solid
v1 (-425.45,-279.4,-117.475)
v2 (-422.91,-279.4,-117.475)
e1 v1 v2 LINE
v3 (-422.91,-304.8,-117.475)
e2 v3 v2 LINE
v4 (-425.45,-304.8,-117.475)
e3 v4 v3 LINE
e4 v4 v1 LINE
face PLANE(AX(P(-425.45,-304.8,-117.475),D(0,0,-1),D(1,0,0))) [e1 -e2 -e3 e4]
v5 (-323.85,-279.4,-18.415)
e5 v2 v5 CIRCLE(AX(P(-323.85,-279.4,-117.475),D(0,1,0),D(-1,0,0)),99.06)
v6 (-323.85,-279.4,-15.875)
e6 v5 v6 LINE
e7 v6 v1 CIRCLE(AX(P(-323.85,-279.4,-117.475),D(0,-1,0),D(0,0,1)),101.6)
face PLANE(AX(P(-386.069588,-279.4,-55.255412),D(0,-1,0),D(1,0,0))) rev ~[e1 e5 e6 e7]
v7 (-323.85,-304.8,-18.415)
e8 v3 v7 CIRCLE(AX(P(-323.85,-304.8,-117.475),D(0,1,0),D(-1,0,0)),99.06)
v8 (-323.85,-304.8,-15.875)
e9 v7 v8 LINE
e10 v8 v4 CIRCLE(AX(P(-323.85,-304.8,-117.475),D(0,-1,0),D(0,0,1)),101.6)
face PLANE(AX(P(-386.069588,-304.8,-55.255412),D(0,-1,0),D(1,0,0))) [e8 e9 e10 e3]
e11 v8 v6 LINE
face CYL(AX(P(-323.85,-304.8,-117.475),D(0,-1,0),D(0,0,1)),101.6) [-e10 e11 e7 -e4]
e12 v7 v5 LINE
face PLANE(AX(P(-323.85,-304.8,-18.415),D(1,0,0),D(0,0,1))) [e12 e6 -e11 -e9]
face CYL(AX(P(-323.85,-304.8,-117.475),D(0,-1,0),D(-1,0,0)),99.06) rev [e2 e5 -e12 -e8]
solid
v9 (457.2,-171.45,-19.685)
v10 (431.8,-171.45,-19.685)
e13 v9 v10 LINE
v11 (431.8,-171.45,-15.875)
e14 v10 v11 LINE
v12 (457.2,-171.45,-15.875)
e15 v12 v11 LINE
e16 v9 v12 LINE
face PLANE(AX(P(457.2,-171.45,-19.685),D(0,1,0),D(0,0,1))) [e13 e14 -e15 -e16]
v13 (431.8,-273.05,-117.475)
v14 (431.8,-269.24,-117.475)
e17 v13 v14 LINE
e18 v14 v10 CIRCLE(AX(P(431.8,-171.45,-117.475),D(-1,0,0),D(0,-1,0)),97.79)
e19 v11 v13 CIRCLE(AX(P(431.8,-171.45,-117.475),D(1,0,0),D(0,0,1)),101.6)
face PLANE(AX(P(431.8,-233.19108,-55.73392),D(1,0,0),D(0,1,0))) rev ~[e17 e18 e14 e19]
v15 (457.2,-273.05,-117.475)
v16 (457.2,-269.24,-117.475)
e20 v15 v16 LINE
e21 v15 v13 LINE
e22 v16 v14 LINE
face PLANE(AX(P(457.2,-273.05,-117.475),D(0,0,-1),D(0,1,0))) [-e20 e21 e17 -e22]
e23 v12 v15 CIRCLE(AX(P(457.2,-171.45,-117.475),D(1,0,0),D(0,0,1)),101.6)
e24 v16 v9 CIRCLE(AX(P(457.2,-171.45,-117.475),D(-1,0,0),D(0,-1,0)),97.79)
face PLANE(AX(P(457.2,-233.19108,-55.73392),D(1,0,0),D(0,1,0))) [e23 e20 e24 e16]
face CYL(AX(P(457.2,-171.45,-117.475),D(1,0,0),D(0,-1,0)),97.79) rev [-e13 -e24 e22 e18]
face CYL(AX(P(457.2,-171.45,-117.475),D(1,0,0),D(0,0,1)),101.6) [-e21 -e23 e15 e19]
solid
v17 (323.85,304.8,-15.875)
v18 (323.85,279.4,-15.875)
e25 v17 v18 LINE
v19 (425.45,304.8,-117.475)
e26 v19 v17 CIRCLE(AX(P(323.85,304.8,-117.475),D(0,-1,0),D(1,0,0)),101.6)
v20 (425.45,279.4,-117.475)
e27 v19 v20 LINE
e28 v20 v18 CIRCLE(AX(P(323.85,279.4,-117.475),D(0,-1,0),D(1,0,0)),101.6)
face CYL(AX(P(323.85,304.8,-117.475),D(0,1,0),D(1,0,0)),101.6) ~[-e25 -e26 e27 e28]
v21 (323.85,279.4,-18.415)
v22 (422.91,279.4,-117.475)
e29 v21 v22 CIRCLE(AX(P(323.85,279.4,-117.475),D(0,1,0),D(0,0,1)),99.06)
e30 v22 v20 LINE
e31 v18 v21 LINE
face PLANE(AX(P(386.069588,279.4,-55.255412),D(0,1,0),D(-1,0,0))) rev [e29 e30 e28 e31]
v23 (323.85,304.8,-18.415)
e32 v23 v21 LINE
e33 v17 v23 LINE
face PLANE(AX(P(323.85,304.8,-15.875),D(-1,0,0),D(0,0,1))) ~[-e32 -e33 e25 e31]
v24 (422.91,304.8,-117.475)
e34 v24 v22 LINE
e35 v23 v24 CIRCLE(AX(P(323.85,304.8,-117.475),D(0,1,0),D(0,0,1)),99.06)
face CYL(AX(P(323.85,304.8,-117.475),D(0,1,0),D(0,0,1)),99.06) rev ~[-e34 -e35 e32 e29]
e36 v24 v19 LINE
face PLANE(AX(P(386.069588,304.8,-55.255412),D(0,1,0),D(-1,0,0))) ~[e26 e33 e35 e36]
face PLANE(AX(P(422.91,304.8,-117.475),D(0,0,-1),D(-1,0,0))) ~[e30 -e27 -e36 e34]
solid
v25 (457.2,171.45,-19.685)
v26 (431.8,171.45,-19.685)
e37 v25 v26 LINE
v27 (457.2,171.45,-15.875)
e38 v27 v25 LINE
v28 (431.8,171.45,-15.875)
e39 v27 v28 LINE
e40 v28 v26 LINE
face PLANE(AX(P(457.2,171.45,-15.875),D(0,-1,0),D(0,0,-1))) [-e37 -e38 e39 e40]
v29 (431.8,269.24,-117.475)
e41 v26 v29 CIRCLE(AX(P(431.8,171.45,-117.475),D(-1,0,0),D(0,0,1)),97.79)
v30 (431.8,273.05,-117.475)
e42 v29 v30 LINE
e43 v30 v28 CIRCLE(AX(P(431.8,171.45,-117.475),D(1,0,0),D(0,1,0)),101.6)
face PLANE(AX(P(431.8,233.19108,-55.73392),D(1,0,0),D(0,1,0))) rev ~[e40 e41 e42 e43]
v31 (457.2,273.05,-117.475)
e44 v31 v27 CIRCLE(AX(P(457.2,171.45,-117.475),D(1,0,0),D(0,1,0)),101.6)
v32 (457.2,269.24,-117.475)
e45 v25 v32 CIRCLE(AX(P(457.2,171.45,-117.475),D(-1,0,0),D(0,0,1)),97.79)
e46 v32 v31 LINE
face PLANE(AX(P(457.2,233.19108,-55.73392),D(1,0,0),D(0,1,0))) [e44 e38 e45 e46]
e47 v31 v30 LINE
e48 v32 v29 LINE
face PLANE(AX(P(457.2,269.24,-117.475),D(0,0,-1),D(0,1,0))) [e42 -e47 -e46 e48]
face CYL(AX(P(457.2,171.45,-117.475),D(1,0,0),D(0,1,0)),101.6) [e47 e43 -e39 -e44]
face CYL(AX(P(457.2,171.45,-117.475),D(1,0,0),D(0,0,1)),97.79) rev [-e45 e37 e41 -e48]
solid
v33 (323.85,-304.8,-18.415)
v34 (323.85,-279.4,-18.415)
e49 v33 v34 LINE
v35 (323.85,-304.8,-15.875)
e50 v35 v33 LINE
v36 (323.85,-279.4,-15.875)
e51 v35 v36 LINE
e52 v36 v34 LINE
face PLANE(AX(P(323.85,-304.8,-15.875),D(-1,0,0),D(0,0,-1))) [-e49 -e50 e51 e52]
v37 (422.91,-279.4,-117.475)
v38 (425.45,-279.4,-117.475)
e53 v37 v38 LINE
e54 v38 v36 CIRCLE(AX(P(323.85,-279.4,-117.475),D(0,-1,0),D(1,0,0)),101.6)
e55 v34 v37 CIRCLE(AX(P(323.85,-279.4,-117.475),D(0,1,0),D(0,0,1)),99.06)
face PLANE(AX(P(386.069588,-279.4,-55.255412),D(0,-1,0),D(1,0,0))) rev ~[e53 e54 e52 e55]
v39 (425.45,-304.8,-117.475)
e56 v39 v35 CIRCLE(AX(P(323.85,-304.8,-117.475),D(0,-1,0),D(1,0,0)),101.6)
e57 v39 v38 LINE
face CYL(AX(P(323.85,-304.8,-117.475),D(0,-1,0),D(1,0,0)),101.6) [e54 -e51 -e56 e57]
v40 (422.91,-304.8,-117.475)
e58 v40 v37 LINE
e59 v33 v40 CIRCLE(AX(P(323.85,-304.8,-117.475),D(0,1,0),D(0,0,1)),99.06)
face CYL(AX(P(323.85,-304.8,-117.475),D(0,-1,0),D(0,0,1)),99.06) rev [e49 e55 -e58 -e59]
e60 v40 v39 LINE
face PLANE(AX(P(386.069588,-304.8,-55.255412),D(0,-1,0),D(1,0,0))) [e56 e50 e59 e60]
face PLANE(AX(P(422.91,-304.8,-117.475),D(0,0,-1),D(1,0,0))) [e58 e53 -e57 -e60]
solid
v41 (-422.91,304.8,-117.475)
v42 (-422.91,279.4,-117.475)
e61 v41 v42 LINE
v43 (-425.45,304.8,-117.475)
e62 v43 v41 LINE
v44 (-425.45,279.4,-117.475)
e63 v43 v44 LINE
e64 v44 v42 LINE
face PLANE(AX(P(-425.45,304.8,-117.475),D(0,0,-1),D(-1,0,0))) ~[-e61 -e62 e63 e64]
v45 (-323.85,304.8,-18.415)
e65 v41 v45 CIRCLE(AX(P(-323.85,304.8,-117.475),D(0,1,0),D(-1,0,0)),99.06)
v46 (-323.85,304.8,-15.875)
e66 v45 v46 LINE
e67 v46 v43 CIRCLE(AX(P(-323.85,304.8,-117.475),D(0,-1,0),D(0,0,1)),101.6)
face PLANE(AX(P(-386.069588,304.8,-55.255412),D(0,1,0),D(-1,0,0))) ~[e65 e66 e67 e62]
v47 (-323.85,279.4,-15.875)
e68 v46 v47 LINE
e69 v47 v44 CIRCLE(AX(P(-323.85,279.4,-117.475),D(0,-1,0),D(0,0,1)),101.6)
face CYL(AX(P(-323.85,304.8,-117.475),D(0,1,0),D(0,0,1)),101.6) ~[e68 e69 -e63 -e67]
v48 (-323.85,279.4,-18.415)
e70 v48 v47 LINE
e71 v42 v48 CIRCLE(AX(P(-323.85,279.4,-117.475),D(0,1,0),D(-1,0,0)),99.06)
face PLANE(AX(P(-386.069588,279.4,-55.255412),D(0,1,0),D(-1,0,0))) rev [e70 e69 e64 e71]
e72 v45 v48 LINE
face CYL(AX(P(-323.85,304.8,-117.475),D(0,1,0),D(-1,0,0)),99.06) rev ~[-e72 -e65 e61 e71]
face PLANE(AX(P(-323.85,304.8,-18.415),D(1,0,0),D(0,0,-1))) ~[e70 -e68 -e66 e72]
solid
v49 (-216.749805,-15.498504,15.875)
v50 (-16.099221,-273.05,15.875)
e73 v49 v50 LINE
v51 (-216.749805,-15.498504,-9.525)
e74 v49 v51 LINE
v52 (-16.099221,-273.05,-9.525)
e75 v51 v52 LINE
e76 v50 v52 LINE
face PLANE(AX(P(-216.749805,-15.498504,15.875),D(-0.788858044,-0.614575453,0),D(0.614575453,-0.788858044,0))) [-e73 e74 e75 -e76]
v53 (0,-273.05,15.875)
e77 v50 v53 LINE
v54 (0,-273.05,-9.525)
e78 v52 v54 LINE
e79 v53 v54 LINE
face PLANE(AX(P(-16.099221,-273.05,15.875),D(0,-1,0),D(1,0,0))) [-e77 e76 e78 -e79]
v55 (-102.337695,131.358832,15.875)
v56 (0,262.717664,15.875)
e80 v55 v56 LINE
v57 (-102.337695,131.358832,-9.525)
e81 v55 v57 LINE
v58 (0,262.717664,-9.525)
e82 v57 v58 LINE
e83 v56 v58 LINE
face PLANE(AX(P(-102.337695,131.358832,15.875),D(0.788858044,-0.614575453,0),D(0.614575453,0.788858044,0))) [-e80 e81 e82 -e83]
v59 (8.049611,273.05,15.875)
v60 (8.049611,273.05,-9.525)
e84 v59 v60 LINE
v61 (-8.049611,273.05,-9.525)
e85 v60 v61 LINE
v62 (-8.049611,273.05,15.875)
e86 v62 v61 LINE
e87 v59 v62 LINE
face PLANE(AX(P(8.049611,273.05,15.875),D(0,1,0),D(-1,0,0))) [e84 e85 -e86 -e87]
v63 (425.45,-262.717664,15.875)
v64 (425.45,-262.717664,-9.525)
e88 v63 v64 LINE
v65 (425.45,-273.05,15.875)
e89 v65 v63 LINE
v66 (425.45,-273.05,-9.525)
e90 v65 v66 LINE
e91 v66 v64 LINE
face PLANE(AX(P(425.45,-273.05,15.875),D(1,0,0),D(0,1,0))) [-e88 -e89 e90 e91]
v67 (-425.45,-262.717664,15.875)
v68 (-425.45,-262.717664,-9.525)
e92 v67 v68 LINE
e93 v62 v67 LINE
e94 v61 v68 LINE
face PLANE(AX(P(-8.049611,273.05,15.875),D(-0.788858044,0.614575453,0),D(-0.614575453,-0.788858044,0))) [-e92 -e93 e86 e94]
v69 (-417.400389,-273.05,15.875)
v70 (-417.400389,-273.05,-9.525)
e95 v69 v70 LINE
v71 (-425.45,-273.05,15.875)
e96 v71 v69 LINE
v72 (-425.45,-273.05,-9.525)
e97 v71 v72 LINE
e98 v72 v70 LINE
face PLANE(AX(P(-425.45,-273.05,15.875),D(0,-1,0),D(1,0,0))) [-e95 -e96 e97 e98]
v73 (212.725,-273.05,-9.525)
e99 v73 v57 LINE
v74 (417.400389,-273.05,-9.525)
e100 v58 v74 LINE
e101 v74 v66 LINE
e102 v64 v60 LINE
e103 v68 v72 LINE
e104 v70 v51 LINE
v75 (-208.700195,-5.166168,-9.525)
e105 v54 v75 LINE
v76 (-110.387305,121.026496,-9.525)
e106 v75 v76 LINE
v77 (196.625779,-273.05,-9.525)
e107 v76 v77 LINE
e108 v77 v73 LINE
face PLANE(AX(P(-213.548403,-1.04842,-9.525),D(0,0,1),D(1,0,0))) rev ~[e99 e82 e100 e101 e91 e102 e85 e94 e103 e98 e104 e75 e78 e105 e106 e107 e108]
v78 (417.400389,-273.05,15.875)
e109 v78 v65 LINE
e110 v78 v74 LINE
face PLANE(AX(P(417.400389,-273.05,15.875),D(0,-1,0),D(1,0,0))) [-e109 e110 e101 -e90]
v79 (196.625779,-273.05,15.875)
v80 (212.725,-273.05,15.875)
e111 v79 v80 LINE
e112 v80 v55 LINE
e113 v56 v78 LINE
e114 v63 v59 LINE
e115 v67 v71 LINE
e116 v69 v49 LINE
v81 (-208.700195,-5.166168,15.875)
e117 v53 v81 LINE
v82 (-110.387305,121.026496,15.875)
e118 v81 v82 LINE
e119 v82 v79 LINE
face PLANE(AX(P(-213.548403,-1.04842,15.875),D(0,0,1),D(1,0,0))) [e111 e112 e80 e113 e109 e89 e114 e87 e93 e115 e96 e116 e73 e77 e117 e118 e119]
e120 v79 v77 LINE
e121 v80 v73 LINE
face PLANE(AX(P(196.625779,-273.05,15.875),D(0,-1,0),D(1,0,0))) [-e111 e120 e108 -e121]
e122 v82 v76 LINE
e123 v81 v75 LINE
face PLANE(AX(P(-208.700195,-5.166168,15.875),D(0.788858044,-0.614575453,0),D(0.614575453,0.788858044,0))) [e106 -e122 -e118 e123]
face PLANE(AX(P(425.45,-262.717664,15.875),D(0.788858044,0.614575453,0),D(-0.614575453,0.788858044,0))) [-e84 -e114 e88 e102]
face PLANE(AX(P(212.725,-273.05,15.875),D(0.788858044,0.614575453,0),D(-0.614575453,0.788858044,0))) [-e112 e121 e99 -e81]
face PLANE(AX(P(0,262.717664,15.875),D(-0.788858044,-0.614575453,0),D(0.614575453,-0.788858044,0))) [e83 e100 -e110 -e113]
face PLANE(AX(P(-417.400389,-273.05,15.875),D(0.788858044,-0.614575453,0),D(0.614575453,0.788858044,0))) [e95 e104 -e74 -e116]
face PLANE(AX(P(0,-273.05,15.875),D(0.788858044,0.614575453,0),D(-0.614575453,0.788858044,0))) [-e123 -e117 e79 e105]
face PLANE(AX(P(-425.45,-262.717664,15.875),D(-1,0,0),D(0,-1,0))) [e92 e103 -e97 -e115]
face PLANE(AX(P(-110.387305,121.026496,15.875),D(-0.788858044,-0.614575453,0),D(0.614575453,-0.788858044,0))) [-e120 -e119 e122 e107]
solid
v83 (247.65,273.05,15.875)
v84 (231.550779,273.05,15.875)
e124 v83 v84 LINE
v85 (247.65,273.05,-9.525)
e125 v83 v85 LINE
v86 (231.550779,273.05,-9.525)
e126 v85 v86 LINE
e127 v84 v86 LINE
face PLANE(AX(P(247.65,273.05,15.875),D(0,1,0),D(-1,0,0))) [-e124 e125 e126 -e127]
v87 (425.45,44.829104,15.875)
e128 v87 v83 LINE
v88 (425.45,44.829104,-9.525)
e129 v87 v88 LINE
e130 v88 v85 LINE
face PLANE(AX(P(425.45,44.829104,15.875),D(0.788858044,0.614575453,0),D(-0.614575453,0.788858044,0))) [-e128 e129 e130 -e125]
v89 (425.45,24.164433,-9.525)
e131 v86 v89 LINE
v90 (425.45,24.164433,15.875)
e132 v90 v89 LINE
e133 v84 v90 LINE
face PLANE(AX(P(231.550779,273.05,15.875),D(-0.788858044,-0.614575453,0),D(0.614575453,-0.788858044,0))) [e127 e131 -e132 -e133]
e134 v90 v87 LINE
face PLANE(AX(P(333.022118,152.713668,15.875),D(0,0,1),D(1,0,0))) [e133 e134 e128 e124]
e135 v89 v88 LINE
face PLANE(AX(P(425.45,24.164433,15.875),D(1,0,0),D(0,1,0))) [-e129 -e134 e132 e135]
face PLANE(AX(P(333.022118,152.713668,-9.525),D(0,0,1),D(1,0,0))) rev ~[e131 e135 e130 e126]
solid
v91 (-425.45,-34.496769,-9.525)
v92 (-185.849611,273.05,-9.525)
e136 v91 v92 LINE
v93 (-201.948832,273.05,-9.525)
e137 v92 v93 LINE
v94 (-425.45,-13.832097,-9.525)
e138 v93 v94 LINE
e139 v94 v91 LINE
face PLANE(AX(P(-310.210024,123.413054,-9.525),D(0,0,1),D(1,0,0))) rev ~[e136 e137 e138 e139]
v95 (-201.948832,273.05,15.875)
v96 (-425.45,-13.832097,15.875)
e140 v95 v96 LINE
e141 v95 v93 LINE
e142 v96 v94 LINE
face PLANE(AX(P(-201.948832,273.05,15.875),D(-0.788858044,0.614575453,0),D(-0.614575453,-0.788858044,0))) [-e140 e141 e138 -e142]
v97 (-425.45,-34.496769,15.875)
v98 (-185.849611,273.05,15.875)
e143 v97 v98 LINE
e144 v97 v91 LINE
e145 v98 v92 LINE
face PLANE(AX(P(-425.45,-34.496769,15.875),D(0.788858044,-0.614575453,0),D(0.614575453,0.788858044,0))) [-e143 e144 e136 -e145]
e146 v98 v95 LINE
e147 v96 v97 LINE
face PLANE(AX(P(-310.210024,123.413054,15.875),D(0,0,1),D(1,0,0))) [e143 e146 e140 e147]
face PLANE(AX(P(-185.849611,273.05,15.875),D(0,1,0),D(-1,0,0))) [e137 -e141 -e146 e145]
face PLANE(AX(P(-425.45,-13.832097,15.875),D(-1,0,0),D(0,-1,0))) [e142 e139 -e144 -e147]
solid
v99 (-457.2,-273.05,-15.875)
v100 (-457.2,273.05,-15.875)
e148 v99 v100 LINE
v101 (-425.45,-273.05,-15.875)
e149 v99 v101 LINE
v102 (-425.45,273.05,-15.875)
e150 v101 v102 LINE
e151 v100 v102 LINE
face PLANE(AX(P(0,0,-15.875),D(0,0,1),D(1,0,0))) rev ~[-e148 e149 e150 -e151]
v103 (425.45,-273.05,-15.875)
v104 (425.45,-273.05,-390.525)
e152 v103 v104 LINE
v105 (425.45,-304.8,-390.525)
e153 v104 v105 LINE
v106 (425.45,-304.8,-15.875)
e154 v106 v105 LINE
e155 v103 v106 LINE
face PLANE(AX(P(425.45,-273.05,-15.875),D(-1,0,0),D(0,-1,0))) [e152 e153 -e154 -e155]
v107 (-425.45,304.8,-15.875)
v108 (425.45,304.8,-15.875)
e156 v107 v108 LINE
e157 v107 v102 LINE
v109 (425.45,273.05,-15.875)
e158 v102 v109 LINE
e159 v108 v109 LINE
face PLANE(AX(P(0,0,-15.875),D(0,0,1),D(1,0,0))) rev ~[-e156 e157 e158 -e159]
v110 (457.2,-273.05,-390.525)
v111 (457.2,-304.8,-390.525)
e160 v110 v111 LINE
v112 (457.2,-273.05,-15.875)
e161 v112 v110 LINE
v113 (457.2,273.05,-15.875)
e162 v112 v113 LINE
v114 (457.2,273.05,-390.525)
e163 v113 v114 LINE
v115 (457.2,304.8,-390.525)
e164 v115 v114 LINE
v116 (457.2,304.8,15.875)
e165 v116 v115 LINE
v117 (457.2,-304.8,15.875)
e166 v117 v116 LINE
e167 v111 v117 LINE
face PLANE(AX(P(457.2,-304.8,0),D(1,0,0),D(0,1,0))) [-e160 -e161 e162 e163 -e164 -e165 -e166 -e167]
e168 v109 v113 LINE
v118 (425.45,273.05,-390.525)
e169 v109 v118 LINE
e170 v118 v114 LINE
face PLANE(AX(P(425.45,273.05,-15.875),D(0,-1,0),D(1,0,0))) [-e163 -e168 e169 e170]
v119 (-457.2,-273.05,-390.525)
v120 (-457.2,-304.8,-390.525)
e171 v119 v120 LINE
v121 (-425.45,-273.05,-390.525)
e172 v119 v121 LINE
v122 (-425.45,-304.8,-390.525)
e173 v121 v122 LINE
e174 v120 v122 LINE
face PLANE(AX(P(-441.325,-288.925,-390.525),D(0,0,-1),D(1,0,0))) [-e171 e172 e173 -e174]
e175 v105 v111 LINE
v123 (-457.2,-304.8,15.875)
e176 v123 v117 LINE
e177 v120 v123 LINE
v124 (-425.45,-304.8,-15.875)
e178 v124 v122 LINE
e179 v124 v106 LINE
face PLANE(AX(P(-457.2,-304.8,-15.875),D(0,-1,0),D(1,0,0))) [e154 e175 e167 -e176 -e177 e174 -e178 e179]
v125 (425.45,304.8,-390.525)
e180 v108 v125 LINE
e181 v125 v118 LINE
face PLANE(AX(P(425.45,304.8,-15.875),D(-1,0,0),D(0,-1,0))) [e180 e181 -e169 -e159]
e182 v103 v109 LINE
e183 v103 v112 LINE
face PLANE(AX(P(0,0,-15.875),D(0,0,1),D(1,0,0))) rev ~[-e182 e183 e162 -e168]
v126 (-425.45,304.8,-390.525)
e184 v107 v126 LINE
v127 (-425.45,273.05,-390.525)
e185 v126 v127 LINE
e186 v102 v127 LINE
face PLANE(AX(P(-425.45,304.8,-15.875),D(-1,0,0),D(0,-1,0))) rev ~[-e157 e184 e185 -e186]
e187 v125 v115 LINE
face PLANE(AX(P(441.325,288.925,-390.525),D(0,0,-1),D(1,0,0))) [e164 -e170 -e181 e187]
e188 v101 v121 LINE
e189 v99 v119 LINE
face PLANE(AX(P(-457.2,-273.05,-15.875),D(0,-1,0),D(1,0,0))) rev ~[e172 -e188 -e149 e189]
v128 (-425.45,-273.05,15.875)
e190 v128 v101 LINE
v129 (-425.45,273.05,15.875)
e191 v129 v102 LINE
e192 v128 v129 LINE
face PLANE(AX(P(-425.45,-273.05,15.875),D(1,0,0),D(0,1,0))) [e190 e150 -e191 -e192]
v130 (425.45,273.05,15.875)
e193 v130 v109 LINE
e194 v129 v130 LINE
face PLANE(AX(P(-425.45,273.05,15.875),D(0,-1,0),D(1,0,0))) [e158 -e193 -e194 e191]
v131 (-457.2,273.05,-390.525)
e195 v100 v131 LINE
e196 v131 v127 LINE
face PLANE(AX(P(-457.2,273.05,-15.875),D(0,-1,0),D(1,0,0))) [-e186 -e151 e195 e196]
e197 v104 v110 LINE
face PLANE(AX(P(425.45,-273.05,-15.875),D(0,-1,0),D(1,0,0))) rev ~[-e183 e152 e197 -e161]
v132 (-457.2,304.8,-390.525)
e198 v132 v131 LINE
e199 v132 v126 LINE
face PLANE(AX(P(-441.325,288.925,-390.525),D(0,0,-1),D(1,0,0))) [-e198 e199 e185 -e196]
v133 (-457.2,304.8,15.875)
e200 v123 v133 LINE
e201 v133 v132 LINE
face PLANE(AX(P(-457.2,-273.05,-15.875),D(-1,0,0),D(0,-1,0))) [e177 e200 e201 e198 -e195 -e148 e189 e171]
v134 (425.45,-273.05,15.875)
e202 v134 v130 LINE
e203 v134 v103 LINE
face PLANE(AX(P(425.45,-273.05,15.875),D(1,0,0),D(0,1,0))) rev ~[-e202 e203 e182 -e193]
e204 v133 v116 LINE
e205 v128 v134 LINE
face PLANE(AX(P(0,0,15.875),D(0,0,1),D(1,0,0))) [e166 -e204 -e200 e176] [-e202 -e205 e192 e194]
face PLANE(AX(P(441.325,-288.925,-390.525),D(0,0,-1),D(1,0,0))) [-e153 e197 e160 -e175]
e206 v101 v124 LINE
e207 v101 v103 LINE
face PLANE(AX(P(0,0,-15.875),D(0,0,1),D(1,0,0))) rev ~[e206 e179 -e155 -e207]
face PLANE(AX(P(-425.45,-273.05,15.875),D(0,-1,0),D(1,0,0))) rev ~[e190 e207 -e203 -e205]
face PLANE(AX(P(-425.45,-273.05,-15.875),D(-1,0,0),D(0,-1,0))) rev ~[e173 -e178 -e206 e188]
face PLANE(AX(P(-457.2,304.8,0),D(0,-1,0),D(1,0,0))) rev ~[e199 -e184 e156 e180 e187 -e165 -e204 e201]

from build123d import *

# Parameters (mm, degrees)
F0_W      = 914.4
F0_H      = 609.6
F1_DEPTH  = 15.875
F2_W      = 850.9
F2_H      = 546.1
F3_DEPTH  = 31.751
F5_DEPTH  = 25.4
F6_W      = 31.75
F6_H      = 31.75
F7_DEPTH  = 374.65
F9_DEPTH  = 25.4
F12_DEPTH = 25.4


# Not quite as in the source:
# - a feature of the source that left no trace in its solid (it failed there, or was rolled back) is left out
# - a feature names something its author has since deleted; it is built from what else it names


with BuildPart() as f1:
    # F0 (on Top) → F1 (new body, symmetric)
    with BuildSketch(Plane.XY):
        Rectangle(F0_W, F0_H)
    extrude(amount=F1_DEPTH, both=True)

    # F2 (on face) → F3 (cut, through all)
    with BuildSketch(Plane.XY.offset(15.875)):
        Rectangle(F2_W, F2_H)
    extrude(amount=-F3_DEPTH, mode=Mode.SUBTRACT)

    # F6 (on face) → F7 (join)
    with BuildSketch(Plane(origin=(0, 0, -15.875), x_dir=(1, 0, 0), z_dir=(0, 0, -1))):
        with Locations((-441.325, 288.925)):
            Rectangle(F6_W, F6_H)
        with Locations((-441.325, -288.925)):
            Rectangle(F6_W, F6_H)
        with Locations((441.325, 288.925)):
            Rectangle(F6_W, F6_H)
        with Locations((441.325, -288.925)):
            Rectangle(F6_W, F6_H)
    extrude(amount=F7_DEPTH)


with BuildPart() as f5:
    # F4 (on face) → F5 (new body)
    with BuildSketch(Plane.XY.offset(15.875)):
        Polygon((-8.0496105111, 273.05), (-425.45, -262.7176641201), (-425.45, -273.05), (-417.4003894889, -273.05), (-216.7498052556, -15.4985038199), (-208.7001947444, -5.16616794), (-110.3873052556, 121.0264961801), (-102.3376947444, 131.35883206), (0, 262.7176641201), align=None)
        Polygon((8.0496105111, 273.05), (-8.0496105111, 273.05), (0, 262.7176641201), (417.4003894889, -273.05), (425.45, -273.05), (425.45, -262.7176641201), align=None)
        Polygon((212.725, -273.05), (-102.3376947444, 131.35883206), (-110.3873052556, 121.0264961801), (196.6257789778, -273.05), align=None)
        Polygon((-208.7001947444, -5.16616794), (-216.7498052556, -15.4985038199), (-16.0992210222, -273.05), (0, -273.05), align=None)
    extrude(amount=-F5_DEPTH)


with BuildPart() as f5b:
    # F4 (on face) → F5, piece 2 (new body)
    with BuildSketch(Plane.XY.offset(15.875)):
        Polygon((231.5507789778, 273.05), (425.45, 24.1644327177), (425.45, 44.8291044776), (247.65, 273.05), align=None)
    extrude(amount=-F5_DEPTH)


with BuildPart() as f5c:
    # F4 (on face) → F5, piece 3 (new body)
    with BuildSketch(Plane.XY.offset(15.875)):
        Polygon((-425.45, -13.8320968378), (-425.45, -34.4967685977), (-185.8496105111, 273.05), (-201.9488315334, 273.05), align=None)
    extrude(amount=-F5_DEPTH)


with BuildPart() as f9:
    # F8 (on face) → F9 (new body)
    with BuildSketch(Plane.XZ.offset(304.8)):
        with BuildLine():
            Line((-323.85, -18.415), (-323.85, -15.875))
            ThreePointArc((-323.85, -15.875), (-395.6920489686, -45.6329510314), (-425.45, -117.475))
            Line((-425.45, -117.475), (-422.91, -117.475))
            ThreePointArc((-422.91, -117.475), (-393.8959977443, -47.4290022557), (-323.85, -18.415))
        make_face()
    extrude(amount=-F9_DEPTH)


with BuildPart() as f9b:
    # F8 (on face) → F9, piece 2 (new body)
    with BuildSketch(Plane.XZ.offset(304.8)):
        with BuildLine():
            Line((323.85, -15.875), (323.85, -18.415))
            ThreePointArc((323.85, -18.415), (393.8959977443, -47.4290022557), (422.91, -117.475))
            Line((422.91, -117.475), (425.45, -117.475))
            ThreePointArc((425.45, -117.475), (395.6920489686, -45.6329510314), (323.85, -15.875))
        make_face()
    extrude(amount=-F9_DEPTH)


with BuildPart() as f10_1:
    # F10: instance of F9
    add(f9.part.mirror(Plane.XZ))


with BuildPart() as f10_2:
    # F10: instance of F9b
    add(f9b.part.mirror(Plane.XZ))


with BuildPart() as f12:
    # F11 (on face) → F12 (new body)
    with BuildSketch(Plane.YZ.offset(457.2)):
        with BuildLine():
            ThreePointArc((273.05, -117.475), (243.2920489686, -45.6329510314), (171.45, -15.875))
            Line((171.45, -15.875), (171.45, -19.685))
            ThreePointArc((171.45, -19.685), (240.5979721322, -48.3270278678), (269.24, -117.475))
            Line((269.24, -117.475), (273.05, -117.475))
        make_face()
    extrude(amount=-F12_DEPTH)


with BuildPart() as f12b:
    # F11 (on face) → F12, piece 2 (new body)
    with BuildSketch(Plane.YZ.offset(457.2)):
        with BuildLine():
            ThreePointArc((-269.24, -117.475), (-240.5979721322, -48.3270278678), (-171.45, -19.685))
            Line((-171.45, -19.685), (-171.45, -15.875))
            ThreePointArc((-171.45, -15.875), (-243.2920489686, -45.6329510314), (-273.05, -117.475))
            Line((-273.05, -117.475), (-269.24, -117.475))
        make_face()
    extrude(amount=-F12_DEPTH)


solid = Compound([f1.part, f5.part, f5b.part, f5c.part, f9.part, f9b.part, f10_1.part, f10_2.part, f12.part, f12b.part])
